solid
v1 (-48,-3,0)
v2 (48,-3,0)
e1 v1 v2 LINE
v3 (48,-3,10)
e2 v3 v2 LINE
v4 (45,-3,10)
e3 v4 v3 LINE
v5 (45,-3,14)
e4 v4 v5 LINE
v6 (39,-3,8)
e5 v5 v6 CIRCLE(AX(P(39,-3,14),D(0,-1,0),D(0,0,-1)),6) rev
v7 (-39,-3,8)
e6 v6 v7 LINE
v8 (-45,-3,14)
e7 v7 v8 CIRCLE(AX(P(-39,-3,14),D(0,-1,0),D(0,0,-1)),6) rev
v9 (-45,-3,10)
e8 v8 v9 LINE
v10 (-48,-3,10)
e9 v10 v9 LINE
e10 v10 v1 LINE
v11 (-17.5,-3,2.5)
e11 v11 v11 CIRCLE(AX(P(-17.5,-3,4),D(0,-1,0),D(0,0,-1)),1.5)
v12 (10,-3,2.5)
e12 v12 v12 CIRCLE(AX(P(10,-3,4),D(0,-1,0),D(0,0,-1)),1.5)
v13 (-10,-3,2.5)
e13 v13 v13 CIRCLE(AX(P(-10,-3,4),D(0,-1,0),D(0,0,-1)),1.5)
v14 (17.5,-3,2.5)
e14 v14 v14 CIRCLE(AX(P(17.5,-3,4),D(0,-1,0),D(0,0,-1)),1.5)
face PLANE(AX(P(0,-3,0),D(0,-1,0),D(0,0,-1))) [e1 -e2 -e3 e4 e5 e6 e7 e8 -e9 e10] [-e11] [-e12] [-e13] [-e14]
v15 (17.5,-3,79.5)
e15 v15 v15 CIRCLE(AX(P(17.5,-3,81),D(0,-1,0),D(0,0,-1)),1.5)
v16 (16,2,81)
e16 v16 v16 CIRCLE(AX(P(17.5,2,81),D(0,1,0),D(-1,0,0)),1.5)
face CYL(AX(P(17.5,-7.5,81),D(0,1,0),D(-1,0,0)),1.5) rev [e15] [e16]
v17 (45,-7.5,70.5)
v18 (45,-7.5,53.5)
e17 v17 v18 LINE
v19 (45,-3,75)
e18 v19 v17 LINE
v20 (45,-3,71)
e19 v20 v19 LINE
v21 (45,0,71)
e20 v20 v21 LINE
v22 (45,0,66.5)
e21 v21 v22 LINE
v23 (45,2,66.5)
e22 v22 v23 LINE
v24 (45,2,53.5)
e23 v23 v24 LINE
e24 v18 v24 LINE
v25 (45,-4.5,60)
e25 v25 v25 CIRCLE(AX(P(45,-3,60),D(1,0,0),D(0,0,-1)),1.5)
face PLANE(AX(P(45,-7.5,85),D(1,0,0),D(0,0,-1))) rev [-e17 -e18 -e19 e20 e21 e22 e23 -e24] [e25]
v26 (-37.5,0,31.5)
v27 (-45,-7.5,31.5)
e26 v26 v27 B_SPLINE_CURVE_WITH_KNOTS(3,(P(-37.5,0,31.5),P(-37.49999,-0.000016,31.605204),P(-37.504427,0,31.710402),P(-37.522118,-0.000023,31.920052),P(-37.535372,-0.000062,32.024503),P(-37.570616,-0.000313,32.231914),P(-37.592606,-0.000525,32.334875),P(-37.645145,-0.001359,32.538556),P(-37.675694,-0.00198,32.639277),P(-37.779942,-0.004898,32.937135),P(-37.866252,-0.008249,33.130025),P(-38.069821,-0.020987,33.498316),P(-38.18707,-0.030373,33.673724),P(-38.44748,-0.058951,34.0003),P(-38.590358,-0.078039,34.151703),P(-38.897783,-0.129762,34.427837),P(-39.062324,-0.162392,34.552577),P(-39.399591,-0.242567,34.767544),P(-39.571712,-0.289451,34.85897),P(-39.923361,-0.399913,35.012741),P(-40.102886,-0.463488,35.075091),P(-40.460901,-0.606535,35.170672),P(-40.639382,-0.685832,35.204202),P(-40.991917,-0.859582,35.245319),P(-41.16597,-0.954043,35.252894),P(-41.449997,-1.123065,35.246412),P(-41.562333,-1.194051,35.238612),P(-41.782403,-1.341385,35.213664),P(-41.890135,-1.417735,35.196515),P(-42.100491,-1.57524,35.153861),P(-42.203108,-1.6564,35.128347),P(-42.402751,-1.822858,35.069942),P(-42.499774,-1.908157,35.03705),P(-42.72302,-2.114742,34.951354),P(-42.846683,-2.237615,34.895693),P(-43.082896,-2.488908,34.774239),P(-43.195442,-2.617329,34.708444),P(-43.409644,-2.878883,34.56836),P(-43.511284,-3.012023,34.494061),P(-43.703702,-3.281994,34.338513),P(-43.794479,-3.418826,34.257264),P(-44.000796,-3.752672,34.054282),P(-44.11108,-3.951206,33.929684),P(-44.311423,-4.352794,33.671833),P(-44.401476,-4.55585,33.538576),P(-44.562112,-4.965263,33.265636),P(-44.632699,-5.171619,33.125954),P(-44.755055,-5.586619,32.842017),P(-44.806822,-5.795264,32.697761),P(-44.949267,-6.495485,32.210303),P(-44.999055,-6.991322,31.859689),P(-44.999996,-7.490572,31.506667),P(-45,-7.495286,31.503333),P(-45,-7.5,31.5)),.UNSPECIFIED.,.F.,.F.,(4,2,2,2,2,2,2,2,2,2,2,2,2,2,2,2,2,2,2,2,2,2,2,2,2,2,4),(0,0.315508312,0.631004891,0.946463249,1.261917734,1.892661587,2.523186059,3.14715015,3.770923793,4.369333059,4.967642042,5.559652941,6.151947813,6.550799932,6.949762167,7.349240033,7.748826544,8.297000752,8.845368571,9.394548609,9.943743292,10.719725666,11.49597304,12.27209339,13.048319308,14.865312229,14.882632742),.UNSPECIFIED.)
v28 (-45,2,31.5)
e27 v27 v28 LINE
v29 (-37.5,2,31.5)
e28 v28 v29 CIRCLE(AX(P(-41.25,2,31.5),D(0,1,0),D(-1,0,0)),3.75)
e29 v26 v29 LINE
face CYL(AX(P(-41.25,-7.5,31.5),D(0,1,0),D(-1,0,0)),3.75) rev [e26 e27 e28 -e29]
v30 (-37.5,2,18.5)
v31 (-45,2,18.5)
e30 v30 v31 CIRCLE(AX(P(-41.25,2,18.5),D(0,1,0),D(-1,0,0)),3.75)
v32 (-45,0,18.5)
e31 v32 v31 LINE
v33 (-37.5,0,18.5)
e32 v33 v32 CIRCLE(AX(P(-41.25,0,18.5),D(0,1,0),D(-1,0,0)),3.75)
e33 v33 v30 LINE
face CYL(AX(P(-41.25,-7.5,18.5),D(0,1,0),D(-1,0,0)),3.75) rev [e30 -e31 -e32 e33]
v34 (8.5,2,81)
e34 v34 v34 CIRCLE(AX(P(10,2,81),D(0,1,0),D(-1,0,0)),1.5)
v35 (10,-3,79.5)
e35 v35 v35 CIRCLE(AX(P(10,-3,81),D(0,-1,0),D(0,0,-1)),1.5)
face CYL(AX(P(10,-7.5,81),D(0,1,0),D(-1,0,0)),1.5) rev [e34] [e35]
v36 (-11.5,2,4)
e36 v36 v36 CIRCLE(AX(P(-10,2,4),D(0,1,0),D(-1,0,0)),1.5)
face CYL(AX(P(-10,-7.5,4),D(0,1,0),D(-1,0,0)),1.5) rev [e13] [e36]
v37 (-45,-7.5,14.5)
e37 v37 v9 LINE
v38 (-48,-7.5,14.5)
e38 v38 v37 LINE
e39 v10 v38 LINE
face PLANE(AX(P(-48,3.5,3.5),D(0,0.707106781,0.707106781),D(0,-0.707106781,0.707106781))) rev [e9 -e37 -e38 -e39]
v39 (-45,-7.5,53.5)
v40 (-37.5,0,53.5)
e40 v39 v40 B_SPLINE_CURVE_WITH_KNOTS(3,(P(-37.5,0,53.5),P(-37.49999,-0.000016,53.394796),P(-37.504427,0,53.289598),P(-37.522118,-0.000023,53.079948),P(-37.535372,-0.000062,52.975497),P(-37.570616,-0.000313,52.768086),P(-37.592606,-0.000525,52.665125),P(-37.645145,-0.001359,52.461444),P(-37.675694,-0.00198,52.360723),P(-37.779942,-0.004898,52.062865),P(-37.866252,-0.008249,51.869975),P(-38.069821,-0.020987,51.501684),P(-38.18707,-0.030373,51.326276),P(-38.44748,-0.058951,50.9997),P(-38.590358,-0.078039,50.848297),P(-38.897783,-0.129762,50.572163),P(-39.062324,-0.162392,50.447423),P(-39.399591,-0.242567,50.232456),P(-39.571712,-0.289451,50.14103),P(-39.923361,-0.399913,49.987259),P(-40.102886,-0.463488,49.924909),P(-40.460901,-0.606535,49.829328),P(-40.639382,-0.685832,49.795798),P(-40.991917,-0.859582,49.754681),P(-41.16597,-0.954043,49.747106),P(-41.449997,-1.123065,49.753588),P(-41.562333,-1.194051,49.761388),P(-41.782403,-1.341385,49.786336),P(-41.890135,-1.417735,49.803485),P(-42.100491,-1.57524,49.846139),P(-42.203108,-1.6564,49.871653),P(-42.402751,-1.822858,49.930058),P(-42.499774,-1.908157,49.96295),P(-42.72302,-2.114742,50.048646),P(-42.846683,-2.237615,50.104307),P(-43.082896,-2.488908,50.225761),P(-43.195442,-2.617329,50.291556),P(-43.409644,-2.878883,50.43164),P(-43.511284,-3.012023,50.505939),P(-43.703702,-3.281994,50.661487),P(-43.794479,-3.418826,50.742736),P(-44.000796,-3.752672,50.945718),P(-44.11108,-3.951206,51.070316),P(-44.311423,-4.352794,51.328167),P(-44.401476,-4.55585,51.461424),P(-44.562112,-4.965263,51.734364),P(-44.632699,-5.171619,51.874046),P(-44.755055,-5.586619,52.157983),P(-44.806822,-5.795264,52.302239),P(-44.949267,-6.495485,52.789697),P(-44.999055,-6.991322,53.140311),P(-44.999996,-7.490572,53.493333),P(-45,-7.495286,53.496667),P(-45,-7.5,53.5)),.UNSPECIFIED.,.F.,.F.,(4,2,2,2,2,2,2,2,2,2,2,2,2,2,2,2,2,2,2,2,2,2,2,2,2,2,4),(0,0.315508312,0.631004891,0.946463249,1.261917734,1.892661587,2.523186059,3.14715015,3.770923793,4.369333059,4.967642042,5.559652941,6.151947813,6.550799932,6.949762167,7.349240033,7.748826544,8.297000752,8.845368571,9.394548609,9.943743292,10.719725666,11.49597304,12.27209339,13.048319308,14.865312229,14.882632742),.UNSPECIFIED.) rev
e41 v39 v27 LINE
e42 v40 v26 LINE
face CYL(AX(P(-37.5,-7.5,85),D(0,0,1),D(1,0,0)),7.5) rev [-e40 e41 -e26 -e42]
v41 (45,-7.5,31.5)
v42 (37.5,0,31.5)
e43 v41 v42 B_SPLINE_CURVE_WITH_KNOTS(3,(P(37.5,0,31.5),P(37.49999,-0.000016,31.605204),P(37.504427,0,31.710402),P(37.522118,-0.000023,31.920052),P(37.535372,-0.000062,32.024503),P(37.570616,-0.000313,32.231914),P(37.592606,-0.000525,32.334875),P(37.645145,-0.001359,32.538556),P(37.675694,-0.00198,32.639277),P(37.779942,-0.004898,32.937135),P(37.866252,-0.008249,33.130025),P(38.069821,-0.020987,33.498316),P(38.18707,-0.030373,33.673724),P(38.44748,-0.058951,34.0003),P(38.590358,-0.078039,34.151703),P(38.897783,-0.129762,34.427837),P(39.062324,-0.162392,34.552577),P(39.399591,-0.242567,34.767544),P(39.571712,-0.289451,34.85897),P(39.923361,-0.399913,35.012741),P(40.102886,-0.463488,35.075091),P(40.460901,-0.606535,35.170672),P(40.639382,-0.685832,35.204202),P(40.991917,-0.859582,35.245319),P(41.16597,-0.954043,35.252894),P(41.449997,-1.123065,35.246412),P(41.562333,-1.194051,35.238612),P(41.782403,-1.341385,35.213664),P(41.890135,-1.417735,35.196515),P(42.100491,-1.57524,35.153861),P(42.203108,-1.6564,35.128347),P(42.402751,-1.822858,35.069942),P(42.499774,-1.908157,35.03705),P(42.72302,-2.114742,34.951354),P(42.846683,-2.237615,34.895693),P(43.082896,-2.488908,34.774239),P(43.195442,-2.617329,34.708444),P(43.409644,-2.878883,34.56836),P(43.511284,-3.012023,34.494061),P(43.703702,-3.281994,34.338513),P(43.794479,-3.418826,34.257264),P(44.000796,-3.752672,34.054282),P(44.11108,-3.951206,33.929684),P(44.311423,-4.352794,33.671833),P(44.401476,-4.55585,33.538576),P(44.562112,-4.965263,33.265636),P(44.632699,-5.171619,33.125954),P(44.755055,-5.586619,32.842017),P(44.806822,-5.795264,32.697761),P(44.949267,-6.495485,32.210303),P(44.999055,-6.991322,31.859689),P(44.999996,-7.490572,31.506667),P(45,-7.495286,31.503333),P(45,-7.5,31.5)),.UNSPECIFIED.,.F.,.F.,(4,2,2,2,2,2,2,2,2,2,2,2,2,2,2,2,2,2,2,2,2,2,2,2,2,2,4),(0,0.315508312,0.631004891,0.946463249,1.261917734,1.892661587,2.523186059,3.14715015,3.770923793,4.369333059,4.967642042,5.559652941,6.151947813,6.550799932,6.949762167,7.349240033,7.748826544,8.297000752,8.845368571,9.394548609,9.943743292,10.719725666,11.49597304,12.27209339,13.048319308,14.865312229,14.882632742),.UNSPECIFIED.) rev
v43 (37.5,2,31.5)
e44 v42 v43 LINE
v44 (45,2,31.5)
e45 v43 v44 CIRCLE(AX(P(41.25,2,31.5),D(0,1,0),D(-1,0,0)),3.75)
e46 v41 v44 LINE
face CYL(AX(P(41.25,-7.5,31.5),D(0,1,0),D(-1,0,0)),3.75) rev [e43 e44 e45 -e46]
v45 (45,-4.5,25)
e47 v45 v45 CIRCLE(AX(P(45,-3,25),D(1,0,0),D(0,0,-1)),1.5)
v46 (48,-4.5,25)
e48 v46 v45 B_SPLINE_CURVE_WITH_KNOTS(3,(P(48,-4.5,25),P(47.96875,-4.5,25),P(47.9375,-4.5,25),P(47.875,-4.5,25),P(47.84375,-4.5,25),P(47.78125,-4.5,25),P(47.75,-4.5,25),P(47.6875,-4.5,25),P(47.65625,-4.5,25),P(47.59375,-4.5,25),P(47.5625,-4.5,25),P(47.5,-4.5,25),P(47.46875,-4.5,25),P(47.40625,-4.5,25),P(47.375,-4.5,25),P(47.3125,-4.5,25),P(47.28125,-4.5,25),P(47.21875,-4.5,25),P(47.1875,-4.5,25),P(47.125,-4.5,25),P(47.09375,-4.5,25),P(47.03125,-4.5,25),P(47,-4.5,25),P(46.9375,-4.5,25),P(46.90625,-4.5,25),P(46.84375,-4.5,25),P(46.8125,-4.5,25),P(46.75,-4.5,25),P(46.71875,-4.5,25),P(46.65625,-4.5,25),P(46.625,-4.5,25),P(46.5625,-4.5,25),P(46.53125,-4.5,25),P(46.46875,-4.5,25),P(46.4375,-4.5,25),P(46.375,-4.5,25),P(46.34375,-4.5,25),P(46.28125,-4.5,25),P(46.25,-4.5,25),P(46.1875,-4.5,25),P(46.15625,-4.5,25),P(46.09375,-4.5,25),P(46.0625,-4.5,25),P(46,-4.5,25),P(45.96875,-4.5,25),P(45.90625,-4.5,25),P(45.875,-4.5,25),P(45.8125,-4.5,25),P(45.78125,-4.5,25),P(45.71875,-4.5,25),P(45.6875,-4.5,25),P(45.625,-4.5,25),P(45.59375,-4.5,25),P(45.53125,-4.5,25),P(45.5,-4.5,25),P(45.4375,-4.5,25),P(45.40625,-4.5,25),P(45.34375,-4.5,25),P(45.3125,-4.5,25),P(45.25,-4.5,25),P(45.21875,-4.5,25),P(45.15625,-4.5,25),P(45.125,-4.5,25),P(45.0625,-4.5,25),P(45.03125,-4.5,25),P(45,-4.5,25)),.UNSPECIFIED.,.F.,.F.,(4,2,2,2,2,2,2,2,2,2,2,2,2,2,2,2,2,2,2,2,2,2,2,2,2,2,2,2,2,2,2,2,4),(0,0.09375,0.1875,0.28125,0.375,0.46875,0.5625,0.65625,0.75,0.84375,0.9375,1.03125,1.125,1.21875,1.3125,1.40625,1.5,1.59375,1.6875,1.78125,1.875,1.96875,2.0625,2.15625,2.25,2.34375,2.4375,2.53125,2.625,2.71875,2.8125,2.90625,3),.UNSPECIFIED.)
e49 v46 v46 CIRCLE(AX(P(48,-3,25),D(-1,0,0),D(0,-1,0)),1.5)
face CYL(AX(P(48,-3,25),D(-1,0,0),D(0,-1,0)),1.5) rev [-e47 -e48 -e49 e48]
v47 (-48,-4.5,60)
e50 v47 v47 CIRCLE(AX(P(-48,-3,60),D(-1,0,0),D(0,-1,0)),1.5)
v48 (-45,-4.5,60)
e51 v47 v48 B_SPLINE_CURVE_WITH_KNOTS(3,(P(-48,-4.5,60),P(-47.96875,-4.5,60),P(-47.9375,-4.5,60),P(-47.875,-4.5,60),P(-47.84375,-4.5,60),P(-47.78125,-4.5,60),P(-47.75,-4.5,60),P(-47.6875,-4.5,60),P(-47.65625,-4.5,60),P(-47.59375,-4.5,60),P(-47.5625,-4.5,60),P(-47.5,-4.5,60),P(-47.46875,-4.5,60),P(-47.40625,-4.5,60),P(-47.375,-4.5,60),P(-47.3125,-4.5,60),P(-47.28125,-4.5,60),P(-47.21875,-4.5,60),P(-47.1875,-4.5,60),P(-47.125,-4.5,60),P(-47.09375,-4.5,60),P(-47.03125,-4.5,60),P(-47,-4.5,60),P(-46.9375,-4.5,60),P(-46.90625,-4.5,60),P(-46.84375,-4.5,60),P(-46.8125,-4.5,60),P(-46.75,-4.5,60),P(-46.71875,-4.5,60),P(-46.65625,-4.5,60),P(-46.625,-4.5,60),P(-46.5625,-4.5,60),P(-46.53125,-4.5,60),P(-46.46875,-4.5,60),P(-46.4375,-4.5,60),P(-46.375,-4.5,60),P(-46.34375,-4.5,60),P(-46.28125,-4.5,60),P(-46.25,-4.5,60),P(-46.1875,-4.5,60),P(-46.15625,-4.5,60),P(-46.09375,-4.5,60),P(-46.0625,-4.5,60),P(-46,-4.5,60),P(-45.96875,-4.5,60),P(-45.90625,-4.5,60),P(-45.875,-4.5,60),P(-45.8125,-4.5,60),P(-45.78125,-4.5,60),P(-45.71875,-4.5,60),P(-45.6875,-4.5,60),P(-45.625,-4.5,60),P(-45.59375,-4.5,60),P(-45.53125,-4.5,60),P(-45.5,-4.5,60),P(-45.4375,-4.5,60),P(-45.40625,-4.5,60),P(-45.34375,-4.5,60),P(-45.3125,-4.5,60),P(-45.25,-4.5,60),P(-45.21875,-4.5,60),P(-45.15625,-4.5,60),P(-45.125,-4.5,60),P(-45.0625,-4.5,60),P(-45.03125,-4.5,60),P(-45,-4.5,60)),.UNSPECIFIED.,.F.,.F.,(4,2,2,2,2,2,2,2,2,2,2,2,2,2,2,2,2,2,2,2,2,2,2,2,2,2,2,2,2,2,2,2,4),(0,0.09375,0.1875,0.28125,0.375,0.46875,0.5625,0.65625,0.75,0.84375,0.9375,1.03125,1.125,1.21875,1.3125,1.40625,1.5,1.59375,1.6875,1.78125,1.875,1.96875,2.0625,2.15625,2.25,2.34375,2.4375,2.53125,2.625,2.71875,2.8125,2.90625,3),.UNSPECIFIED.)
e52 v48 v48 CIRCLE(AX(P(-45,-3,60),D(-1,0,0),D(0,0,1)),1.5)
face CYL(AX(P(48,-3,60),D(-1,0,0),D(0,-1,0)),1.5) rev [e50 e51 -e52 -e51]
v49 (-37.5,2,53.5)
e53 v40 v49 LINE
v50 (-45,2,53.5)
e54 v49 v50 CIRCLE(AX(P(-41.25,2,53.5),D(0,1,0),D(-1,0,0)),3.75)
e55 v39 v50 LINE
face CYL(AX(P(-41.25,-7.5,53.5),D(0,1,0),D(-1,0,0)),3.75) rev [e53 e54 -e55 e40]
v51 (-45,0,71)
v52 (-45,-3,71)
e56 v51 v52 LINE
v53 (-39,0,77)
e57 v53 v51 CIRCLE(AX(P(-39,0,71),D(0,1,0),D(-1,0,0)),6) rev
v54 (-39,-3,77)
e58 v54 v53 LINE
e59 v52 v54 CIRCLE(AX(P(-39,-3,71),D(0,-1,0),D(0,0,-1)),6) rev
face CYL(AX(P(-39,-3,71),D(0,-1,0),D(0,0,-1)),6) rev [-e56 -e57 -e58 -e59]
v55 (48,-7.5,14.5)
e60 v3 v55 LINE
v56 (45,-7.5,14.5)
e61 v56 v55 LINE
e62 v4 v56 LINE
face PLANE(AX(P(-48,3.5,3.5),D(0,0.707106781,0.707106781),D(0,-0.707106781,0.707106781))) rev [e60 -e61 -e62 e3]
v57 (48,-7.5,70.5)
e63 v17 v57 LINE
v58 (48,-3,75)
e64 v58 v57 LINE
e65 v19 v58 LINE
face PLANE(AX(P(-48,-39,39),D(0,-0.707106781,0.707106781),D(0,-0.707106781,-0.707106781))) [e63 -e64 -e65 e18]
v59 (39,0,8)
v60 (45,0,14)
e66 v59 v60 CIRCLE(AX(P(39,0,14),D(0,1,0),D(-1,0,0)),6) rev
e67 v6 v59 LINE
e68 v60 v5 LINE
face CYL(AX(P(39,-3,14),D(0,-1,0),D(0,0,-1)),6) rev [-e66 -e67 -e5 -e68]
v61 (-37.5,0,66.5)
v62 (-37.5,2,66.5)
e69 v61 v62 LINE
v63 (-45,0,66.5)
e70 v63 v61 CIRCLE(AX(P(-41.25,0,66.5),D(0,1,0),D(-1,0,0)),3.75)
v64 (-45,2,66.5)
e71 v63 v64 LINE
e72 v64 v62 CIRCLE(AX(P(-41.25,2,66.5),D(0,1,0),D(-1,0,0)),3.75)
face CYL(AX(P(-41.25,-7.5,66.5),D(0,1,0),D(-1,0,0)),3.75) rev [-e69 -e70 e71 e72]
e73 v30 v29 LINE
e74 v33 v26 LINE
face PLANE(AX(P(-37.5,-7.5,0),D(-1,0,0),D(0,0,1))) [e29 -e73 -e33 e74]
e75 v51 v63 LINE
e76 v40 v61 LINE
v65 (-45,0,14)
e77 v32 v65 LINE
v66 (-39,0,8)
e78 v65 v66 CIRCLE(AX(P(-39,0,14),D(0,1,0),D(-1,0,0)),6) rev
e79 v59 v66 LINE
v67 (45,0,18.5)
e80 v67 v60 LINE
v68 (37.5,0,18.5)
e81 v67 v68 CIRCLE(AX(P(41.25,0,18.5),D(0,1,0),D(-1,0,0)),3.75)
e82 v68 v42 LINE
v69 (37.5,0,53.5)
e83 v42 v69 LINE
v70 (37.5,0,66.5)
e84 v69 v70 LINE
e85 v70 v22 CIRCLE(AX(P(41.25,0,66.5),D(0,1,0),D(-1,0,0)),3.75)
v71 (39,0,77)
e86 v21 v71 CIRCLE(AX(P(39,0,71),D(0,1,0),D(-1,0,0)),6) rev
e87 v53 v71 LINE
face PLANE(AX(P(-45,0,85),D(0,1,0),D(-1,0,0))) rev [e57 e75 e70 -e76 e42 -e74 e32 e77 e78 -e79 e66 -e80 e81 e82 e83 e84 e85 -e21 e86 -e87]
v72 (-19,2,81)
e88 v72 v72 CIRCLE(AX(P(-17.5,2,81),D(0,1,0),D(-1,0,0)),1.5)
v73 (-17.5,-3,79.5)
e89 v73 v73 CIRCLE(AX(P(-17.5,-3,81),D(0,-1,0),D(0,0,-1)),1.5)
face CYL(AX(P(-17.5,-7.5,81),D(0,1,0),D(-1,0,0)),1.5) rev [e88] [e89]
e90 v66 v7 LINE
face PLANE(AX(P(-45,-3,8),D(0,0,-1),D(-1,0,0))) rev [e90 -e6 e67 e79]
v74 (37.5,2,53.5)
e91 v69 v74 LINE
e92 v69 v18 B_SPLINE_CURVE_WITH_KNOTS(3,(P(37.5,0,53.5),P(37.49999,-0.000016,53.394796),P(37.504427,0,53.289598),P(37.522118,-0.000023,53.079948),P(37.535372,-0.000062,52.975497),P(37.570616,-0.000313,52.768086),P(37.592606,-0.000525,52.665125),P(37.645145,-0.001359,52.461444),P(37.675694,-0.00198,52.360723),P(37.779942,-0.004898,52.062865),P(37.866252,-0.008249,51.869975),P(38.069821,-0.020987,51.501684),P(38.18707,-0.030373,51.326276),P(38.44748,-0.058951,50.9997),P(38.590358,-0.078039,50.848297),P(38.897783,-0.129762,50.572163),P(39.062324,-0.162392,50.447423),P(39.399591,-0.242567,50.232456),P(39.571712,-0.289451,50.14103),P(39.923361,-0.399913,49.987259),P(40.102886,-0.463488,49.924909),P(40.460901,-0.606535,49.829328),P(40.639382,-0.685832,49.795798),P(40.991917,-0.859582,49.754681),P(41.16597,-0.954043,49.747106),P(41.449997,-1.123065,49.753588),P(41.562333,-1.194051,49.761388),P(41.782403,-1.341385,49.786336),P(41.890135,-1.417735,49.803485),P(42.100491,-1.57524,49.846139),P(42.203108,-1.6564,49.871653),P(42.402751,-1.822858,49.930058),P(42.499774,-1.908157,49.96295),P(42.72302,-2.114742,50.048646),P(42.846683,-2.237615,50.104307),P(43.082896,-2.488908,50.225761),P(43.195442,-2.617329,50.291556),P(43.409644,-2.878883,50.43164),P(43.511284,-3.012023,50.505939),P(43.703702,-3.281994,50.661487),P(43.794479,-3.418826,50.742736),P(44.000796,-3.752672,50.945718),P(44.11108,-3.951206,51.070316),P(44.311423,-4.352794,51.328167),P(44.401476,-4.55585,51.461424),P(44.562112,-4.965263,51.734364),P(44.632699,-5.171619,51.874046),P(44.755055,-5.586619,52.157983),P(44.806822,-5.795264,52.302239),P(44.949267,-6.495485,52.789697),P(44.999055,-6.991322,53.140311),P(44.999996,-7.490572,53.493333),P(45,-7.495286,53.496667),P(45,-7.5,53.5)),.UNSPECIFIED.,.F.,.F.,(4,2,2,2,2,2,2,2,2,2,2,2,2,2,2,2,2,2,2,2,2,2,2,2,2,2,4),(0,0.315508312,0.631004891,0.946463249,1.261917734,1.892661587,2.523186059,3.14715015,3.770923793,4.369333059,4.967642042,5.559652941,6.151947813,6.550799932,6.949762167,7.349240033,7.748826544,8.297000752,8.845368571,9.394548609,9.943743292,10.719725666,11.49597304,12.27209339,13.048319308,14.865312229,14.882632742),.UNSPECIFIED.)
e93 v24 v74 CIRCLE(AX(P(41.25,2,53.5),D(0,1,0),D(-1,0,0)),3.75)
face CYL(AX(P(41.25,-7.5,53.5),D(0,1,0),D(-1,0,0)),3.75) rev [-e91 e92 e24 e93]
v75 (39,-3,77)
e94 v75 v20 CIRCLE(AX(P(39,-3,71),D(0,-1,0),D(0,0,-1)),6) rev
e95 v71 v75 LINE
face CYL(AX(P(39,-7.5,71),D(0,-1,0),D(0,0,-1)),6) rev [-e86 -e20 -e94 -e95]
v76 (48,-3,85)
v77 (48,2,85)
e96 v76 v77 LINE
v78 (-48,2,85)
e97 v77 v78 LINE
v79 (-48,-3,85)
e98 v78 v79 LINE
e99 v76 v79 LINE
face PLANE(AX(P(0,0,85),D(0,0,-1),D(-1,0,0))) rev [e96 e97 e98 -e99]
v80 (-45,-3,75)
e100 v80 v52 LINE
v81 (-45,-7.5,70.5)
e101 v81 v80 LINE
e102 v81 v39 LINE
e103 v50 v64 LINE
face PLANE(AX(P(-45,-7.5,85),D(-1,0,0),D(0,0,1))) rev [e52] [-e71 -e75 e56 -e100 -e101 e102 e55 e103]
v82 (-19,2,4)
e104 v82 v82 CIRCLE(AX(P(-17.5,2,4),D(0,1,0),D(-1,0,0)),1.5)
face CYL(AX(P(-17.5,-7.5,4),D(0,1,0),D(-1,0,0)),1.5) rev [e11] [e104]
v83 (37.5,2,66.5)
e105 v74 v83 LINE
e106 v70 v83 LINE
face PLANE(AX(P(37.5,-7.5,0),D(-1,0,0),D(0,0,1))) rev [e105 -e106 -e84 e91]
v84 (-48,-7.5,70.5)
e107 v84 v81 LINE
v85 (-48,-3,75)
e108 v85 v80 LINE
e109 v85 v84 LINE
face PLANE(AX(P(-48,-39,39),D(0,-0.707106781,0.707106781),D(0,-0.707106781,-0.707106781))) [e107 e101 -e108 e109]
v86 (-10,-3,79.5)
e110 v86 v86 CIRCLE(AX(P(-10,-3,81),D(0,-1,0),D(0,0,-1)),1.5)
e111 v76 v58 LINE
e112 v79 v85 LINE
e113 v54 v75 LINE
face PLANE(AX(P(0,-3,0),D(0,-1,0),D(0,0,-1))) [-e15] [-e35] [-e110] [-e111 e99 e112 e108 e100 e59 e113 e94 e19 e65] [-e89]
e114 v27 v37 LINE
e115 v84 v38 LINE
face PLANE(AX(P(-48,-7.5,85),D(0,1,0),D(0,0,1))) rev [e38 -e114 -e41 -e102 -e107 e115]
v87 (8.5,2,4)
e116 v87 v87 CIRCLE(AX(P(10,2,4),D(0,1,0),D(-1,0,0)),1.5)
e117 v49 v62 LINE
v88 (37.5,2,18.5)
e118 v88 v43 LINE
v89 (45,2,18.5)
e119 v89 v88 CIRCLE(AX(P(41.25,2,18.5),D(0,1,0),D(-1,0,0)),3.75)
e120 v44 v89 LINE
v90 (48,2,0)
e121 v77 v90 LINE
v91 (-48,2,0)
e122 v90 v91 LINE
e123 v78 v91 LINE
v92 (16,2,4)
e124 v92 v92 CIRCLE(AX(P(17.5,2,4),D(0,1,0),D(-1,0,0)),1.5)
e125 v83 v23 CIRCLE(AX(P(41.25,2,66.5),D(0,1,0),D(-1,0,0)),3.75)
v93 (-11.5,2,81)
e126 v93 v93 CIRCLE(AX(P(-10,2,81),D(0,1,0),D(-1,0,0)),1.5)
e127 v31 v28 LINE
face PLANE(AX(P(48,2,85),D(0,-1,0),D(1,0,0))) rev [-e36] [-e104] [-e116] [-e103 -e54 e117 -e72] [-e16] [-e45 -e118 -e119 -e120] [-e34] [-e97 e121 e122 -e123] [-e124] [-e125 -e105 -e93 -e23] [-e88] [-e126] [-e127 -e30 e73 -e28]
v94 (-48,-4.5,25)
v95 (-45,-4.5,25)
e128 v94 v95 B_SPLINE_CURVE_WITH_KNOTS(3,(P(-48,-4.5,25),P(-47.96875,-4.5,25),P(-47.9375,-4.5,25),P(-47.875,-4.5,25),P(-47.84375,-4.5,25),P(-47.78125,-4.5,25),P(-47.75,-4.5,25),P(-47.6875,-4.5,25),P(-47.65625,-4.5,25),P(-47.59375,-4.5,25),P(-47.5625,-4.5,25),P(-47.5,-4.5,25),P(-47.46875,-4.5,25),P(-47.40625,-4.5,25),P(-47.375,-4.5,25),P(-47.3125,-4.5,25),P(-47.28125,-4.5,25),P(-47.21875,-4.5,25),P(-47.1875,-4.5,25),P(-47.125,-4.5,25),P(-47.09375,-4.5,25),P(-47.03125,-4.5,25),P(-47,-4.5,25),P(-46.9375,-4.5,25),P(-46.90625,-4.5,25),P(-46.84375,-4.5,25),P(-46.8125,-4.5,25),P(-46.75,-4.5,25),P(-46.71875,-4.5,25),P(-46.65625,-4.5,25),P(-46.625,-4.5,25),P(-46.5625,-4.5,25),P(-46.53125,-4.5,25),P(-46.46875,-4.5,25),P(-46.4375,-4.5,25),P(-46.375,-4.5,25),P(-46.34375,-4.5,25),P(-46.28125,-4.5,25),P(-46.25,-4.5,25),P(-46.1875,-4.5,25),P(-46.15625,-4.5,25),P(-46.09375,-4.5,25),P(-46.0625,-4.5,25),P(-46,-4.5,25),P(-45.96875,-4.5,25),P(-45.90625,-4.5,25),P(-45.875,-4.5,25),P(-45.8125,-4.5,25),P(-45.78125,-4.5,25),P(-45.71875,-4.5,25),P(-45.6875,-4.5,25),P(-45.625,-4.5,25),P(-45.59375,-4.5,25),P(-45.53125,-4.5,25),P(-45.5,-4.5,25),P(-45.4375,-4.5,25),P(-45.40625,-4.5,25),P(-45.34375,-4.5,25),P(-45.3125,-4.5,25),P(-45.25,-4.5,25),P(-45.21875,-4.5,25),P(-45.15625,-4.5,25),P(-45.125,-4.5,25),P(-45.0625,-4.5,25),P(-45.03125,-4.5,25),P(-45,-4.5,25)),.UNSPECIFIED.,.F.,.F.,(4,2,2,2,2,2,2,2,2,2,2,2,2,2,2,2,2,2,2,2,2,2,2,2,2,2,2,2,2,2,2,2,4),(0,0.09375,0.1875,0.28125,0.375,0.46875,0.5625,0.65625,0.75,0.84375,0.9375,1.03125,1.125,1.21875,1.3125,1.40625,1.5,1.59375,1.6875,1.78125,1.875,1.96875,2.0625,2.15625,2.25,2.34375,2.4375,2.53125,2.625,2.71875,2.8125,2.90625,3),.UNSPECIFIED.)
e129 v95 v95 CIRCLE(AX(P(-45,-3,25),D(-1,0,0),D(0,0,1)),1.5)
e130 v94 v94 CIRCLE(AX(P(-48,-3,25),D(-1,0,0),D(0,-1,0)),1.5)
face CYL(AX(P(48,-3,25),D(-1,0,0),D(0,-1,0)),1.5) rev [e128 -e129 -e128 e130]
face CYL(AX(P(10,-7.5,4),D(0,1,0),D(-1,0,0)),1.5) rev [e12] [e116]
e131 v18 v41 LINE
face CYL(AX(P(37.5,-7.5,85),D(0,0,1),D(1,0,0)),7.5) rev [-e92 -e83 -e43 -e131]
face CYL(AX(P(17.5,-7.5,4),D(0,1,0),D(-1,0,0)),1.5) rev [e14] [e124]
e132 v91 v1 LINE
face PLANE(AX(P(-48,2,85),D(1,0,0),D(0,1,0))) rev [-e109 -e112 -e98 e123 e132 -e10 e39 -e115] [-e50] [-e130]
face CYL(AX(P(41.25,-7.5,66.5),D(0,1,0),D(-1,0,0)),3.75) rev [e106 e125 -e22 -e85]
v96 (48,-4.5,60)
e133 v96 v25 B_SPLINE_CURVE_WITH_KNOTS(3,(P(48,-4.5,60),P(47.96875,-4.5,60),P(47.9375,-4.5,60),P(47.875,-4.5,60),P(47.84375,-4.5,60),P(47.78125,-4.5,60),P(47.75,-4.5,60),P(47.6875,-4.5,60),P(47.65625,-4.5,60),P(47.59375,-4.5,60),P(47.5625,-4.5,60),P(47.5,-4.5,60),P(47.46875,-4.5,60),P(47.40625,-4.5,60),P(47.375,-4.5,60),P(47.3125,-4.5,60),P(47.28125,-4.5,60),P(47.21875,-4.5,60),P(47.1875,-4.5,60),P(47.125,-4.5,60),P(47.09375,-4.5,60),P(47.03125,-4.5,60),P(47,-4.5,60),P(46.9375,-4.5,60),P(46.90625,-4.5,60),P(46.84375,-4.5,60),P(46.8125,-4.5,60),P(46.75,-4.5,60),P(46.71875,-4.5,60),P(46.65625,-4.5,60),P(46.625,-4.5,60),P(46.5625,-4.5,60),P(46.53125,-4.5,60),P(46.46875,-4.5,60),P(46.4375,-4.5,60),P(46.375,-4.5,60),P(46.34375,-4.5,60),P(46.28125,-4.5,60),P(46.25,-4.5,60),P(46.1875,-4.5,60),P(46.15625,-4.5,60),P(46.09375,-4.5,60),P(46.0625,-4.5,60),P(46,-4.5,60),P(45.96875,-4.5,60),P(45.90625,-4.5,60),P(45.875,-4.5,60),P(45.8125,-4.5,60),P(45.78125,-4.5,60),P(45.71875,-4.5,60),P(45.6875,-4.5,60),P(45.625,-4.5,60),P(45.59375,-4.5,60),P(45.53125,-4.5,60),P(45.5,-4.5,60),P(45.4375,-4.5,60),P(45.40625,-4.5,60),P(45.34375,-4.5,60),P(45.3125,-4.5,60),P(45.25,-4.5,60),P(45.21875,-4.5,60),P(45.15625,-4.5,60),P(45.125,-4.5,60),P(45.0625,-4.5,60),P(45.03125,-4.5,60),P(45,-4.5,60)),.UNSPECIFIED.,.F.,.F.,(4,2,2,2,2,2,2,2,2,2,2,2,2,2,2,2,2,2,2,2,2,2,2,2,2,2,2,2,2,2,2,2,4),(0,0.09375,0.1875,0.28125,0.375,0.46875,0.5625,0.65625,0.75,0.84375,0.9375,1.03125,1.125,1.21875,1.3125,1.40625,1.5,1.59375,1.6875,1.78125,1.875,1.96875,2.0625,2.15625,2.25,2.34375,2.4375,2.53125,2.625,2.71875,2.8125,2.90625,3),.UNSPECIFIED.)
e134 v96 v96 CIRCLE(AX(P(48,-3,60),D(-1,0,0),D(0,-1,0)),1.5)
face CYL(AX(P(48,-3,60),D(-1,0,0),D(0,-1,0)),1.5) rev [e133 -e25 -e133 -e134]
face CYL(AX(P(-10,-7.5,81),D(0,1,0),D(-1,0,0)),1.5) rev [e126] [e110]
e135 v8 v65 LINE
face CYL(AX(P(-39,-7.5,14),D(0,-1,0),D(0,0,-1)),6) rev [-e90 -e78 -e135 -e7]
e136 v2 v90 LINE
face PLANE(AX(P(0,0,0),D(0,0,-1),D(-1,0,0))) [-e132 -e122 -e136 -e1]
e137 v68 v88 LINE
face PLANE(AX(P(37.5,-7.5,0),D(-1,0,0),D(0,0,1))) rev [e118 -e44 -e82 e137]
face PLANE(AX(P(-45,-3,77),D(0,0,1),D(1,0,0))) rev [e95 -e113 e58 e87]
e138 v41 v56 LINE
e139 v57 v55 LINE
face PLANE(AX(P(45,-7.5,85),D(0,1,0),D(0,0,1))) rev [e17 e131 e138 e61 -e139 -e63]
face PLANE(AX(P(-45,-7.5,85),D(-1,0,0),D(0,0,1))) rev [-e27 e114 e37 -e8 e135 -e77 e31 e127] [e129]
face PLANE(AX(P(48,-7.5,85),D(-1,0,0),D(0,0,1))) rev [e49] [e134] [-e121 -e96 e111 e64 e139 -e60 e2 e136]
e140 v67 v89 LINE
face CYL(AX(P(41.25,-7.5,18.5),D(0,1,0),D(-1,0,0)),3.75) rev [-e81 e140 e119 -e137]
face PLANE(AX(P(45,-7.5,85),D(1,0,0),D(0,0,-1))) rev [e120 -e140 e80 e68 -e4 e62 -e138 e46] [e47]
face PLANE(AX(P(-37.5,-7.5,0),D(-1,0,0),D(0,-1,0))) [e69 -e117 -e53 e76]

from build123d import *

# Parameters (mm, degrees)
BOSS_EXTRUDE1_DEPTH = 85
SKETCH3_R           = 1.5
CUT_EXTRUDE2_DEPTH  = 129.44162098
CUT_EXTRUDE3_DEPTH  = 99.07777526
SKETCH5_W           = 90
SKETCH5_H           = 8
BOSS_EXTRUDE2_DEPTH = 3
SKETCH6_R           = 1.5
CUT_EXTRUDE4_DEPTH  = 99.07777526
FILLET4_R           = 6
FILLET5_R           = 7.5
CUT_EXTRUDE5_DEPTH  = 129.44162098


with BuildPart() as part:
    # Sketch1 → Boss-Extrude1 (new body)
    with BuildSketch(Plane.XY):
        Polygon((-45, 0), (45, 0), (45, -7.5), (48, -7.5), (48, 2), (-48, 2), (-48, -7.5), (-45, -7.5), align=None)
    extrude(amount=BOSS_EXTRUDE1_DEPTH)

    # Sketch3 → Cut-Extrude2 (cut, through all)
    with BuildSketch(Plane.ZY.offset(48)):
        with Locations(Location((25, -3, 0), (0, 0, 270))):
            Circle(SKETCH3_R)
        with Locations(Location((60, -3, 0), (0, 0, 270))):
            Circle(SKETCH3_R)
    extrude(amount=-CUT_EXTRUDE2_DEPTH, mode=Mode.SUBTRACT)

    # Sketch4 → Cut-Extrude3 (cut, through all)
    with BuildSketch(Plane(origin=(0, 2, 0), x_dir=(1, 0, 0), z_dir=(0, 1, 0))):
        with BuildLine():
            Line((-37.5, -53.5), (-37.5, -66.5))
            ThreePointArc((-37.5, -66.5), (-41.25, -70.25), (-45, -66.5))
            Line((-45, -66.5), (-45, -53.5))
            ThreePointArc((-45, -53.5), (-41.25, -49.75), (-37.5, -53.5))
        make_face()
        with BuildLine():
            Line((-45, -18.5), (-45, -31.5))
            ThreePointArc((-45, -31.5), (-41.25, -35.25), (-37.5, -31.5))
            Line((-37.5, -31.5), (-37.5, -18.5))
            ThreePointArc((-37.5, -18.5), (-41.25, -14.75), (-45, -18.5))
        make_face()
        with BuildLine():
            Line((45, -31.5), (45, -18.5))
            ThreePointArc((45, -18.5), (41.25, -14.75), (37.5, -18.5))
            Line((37.5, -18.5), (37.5, -31.5))
            ThreePointArc((37.5, -31.5), (41.25, -35.25), (45, -31.5))
        make_face()
        with BuildLine():
            Line((45, -66.5), (45, -53.5))
            ThreePointArc((45, -53.5), (41.25, -49.75), (37.5, -53.5))
            Line((37.5, -53.5), (37.5, -66.5))
            ThreePointArc((37.5, -66.5), (41.25, -70.25), (45, -66.5))
        make_face()
    extrude(amount=-CUT_EXTRUDE3_DEPTH, mode=Mode.SUBTRACT)

    # Sketch5 → Boss-Extrude2 (add)
    with BuildSketch(Plane.XZ):
        with Locations((0, 81)):
            Rectangle(SKETCH5_W, SKETCH5_H)
        with Locations((0, 4)):
            Rectangle(SKETCH5_W, SKETCH5_H)
    extrude(amount=BOSS_EXTRUDE2_DEPTH)

    # Sketch6 → Cut-Extrude4 (cut, through all)
    with BuildSketch(Plane(origin=(0, 2, 0), x_dir=(1, 0, 0), z_dir=(0, 1, 0))):
        with Locations(Location((-17.5, -4, 0), (0, 0, 180))):
            Circle(SKETCH6_R)
        with Locations(Location((17.5, -4, 0), (0, 0, 180))):
            Circle(SKETCH6_R)
        with Locations(Location((-17.5, -81, 0), (0, 0, 180))):
            Circle(SKETCH6_R)
        with Locations(Location((17.5, -81, 0), (0, 0, 180))):
            Circle(SKETCH6_R)
        with Locations(Location((-10, -4, 0), (0, 0, 180))):
            Circle(SKETCH6_R)
        with Locations(Location((10, -4, 0), (0, 0, 180))):
            Circle(SKETCH6_R)
        with Locations(Location((-10, -81, 0), (0, 0, 180))):
            Circle(SKETCH6_R)
        with Locations(Location((10, -81, 0), (0, 0, 180))):
            Circle(SKETCH6_R)
    extrude(amount=-CUT_EXTRUDE4_DEPTH, mode=Mode.SUBTRACT)

    # Fillet4
    fillet4_edges = [part.edges().sort_by_distance(p)[0] for p in [
        (-45, -1.5, 77),
        (45, -1.5, 77),
        (-45, -1.5, 8),
        (45, -1.5, 8),
    ]]
    fillet(fillet4_edges, radius=FILLET4_R)

    # Fillet5
    fillet5_edges = [part.edges().sort_by_distance(p)[0] for p in [
        (45, 0, 42.5),
        (-45, 0, 42.5),
    ]]
    fillet(fillet5_edges, radius=FILLET5_R - 0.0001)  # a hair under: the kernel refuses the full size

    # Sketch7 → Cut-Extrude5 (cut, through all)
    with BuildSketch(Plane(origin=(48, 0, 0), x_dir=(0, 0, -1), z_dir=(1, 0, 0))):
        Polygon((-75, -3), (-85, -3), (-85, -7.5), (-70.5, -7.5), align=None)
        Polygon((-10, -3), (-14.5, -7.5), (0, -7.5), (0, -3), align=None)
    extrude(amount=-CUT_EXTRUDE5_DEPTH, mode=Mode.SUBTRACT)


solid = part.part
